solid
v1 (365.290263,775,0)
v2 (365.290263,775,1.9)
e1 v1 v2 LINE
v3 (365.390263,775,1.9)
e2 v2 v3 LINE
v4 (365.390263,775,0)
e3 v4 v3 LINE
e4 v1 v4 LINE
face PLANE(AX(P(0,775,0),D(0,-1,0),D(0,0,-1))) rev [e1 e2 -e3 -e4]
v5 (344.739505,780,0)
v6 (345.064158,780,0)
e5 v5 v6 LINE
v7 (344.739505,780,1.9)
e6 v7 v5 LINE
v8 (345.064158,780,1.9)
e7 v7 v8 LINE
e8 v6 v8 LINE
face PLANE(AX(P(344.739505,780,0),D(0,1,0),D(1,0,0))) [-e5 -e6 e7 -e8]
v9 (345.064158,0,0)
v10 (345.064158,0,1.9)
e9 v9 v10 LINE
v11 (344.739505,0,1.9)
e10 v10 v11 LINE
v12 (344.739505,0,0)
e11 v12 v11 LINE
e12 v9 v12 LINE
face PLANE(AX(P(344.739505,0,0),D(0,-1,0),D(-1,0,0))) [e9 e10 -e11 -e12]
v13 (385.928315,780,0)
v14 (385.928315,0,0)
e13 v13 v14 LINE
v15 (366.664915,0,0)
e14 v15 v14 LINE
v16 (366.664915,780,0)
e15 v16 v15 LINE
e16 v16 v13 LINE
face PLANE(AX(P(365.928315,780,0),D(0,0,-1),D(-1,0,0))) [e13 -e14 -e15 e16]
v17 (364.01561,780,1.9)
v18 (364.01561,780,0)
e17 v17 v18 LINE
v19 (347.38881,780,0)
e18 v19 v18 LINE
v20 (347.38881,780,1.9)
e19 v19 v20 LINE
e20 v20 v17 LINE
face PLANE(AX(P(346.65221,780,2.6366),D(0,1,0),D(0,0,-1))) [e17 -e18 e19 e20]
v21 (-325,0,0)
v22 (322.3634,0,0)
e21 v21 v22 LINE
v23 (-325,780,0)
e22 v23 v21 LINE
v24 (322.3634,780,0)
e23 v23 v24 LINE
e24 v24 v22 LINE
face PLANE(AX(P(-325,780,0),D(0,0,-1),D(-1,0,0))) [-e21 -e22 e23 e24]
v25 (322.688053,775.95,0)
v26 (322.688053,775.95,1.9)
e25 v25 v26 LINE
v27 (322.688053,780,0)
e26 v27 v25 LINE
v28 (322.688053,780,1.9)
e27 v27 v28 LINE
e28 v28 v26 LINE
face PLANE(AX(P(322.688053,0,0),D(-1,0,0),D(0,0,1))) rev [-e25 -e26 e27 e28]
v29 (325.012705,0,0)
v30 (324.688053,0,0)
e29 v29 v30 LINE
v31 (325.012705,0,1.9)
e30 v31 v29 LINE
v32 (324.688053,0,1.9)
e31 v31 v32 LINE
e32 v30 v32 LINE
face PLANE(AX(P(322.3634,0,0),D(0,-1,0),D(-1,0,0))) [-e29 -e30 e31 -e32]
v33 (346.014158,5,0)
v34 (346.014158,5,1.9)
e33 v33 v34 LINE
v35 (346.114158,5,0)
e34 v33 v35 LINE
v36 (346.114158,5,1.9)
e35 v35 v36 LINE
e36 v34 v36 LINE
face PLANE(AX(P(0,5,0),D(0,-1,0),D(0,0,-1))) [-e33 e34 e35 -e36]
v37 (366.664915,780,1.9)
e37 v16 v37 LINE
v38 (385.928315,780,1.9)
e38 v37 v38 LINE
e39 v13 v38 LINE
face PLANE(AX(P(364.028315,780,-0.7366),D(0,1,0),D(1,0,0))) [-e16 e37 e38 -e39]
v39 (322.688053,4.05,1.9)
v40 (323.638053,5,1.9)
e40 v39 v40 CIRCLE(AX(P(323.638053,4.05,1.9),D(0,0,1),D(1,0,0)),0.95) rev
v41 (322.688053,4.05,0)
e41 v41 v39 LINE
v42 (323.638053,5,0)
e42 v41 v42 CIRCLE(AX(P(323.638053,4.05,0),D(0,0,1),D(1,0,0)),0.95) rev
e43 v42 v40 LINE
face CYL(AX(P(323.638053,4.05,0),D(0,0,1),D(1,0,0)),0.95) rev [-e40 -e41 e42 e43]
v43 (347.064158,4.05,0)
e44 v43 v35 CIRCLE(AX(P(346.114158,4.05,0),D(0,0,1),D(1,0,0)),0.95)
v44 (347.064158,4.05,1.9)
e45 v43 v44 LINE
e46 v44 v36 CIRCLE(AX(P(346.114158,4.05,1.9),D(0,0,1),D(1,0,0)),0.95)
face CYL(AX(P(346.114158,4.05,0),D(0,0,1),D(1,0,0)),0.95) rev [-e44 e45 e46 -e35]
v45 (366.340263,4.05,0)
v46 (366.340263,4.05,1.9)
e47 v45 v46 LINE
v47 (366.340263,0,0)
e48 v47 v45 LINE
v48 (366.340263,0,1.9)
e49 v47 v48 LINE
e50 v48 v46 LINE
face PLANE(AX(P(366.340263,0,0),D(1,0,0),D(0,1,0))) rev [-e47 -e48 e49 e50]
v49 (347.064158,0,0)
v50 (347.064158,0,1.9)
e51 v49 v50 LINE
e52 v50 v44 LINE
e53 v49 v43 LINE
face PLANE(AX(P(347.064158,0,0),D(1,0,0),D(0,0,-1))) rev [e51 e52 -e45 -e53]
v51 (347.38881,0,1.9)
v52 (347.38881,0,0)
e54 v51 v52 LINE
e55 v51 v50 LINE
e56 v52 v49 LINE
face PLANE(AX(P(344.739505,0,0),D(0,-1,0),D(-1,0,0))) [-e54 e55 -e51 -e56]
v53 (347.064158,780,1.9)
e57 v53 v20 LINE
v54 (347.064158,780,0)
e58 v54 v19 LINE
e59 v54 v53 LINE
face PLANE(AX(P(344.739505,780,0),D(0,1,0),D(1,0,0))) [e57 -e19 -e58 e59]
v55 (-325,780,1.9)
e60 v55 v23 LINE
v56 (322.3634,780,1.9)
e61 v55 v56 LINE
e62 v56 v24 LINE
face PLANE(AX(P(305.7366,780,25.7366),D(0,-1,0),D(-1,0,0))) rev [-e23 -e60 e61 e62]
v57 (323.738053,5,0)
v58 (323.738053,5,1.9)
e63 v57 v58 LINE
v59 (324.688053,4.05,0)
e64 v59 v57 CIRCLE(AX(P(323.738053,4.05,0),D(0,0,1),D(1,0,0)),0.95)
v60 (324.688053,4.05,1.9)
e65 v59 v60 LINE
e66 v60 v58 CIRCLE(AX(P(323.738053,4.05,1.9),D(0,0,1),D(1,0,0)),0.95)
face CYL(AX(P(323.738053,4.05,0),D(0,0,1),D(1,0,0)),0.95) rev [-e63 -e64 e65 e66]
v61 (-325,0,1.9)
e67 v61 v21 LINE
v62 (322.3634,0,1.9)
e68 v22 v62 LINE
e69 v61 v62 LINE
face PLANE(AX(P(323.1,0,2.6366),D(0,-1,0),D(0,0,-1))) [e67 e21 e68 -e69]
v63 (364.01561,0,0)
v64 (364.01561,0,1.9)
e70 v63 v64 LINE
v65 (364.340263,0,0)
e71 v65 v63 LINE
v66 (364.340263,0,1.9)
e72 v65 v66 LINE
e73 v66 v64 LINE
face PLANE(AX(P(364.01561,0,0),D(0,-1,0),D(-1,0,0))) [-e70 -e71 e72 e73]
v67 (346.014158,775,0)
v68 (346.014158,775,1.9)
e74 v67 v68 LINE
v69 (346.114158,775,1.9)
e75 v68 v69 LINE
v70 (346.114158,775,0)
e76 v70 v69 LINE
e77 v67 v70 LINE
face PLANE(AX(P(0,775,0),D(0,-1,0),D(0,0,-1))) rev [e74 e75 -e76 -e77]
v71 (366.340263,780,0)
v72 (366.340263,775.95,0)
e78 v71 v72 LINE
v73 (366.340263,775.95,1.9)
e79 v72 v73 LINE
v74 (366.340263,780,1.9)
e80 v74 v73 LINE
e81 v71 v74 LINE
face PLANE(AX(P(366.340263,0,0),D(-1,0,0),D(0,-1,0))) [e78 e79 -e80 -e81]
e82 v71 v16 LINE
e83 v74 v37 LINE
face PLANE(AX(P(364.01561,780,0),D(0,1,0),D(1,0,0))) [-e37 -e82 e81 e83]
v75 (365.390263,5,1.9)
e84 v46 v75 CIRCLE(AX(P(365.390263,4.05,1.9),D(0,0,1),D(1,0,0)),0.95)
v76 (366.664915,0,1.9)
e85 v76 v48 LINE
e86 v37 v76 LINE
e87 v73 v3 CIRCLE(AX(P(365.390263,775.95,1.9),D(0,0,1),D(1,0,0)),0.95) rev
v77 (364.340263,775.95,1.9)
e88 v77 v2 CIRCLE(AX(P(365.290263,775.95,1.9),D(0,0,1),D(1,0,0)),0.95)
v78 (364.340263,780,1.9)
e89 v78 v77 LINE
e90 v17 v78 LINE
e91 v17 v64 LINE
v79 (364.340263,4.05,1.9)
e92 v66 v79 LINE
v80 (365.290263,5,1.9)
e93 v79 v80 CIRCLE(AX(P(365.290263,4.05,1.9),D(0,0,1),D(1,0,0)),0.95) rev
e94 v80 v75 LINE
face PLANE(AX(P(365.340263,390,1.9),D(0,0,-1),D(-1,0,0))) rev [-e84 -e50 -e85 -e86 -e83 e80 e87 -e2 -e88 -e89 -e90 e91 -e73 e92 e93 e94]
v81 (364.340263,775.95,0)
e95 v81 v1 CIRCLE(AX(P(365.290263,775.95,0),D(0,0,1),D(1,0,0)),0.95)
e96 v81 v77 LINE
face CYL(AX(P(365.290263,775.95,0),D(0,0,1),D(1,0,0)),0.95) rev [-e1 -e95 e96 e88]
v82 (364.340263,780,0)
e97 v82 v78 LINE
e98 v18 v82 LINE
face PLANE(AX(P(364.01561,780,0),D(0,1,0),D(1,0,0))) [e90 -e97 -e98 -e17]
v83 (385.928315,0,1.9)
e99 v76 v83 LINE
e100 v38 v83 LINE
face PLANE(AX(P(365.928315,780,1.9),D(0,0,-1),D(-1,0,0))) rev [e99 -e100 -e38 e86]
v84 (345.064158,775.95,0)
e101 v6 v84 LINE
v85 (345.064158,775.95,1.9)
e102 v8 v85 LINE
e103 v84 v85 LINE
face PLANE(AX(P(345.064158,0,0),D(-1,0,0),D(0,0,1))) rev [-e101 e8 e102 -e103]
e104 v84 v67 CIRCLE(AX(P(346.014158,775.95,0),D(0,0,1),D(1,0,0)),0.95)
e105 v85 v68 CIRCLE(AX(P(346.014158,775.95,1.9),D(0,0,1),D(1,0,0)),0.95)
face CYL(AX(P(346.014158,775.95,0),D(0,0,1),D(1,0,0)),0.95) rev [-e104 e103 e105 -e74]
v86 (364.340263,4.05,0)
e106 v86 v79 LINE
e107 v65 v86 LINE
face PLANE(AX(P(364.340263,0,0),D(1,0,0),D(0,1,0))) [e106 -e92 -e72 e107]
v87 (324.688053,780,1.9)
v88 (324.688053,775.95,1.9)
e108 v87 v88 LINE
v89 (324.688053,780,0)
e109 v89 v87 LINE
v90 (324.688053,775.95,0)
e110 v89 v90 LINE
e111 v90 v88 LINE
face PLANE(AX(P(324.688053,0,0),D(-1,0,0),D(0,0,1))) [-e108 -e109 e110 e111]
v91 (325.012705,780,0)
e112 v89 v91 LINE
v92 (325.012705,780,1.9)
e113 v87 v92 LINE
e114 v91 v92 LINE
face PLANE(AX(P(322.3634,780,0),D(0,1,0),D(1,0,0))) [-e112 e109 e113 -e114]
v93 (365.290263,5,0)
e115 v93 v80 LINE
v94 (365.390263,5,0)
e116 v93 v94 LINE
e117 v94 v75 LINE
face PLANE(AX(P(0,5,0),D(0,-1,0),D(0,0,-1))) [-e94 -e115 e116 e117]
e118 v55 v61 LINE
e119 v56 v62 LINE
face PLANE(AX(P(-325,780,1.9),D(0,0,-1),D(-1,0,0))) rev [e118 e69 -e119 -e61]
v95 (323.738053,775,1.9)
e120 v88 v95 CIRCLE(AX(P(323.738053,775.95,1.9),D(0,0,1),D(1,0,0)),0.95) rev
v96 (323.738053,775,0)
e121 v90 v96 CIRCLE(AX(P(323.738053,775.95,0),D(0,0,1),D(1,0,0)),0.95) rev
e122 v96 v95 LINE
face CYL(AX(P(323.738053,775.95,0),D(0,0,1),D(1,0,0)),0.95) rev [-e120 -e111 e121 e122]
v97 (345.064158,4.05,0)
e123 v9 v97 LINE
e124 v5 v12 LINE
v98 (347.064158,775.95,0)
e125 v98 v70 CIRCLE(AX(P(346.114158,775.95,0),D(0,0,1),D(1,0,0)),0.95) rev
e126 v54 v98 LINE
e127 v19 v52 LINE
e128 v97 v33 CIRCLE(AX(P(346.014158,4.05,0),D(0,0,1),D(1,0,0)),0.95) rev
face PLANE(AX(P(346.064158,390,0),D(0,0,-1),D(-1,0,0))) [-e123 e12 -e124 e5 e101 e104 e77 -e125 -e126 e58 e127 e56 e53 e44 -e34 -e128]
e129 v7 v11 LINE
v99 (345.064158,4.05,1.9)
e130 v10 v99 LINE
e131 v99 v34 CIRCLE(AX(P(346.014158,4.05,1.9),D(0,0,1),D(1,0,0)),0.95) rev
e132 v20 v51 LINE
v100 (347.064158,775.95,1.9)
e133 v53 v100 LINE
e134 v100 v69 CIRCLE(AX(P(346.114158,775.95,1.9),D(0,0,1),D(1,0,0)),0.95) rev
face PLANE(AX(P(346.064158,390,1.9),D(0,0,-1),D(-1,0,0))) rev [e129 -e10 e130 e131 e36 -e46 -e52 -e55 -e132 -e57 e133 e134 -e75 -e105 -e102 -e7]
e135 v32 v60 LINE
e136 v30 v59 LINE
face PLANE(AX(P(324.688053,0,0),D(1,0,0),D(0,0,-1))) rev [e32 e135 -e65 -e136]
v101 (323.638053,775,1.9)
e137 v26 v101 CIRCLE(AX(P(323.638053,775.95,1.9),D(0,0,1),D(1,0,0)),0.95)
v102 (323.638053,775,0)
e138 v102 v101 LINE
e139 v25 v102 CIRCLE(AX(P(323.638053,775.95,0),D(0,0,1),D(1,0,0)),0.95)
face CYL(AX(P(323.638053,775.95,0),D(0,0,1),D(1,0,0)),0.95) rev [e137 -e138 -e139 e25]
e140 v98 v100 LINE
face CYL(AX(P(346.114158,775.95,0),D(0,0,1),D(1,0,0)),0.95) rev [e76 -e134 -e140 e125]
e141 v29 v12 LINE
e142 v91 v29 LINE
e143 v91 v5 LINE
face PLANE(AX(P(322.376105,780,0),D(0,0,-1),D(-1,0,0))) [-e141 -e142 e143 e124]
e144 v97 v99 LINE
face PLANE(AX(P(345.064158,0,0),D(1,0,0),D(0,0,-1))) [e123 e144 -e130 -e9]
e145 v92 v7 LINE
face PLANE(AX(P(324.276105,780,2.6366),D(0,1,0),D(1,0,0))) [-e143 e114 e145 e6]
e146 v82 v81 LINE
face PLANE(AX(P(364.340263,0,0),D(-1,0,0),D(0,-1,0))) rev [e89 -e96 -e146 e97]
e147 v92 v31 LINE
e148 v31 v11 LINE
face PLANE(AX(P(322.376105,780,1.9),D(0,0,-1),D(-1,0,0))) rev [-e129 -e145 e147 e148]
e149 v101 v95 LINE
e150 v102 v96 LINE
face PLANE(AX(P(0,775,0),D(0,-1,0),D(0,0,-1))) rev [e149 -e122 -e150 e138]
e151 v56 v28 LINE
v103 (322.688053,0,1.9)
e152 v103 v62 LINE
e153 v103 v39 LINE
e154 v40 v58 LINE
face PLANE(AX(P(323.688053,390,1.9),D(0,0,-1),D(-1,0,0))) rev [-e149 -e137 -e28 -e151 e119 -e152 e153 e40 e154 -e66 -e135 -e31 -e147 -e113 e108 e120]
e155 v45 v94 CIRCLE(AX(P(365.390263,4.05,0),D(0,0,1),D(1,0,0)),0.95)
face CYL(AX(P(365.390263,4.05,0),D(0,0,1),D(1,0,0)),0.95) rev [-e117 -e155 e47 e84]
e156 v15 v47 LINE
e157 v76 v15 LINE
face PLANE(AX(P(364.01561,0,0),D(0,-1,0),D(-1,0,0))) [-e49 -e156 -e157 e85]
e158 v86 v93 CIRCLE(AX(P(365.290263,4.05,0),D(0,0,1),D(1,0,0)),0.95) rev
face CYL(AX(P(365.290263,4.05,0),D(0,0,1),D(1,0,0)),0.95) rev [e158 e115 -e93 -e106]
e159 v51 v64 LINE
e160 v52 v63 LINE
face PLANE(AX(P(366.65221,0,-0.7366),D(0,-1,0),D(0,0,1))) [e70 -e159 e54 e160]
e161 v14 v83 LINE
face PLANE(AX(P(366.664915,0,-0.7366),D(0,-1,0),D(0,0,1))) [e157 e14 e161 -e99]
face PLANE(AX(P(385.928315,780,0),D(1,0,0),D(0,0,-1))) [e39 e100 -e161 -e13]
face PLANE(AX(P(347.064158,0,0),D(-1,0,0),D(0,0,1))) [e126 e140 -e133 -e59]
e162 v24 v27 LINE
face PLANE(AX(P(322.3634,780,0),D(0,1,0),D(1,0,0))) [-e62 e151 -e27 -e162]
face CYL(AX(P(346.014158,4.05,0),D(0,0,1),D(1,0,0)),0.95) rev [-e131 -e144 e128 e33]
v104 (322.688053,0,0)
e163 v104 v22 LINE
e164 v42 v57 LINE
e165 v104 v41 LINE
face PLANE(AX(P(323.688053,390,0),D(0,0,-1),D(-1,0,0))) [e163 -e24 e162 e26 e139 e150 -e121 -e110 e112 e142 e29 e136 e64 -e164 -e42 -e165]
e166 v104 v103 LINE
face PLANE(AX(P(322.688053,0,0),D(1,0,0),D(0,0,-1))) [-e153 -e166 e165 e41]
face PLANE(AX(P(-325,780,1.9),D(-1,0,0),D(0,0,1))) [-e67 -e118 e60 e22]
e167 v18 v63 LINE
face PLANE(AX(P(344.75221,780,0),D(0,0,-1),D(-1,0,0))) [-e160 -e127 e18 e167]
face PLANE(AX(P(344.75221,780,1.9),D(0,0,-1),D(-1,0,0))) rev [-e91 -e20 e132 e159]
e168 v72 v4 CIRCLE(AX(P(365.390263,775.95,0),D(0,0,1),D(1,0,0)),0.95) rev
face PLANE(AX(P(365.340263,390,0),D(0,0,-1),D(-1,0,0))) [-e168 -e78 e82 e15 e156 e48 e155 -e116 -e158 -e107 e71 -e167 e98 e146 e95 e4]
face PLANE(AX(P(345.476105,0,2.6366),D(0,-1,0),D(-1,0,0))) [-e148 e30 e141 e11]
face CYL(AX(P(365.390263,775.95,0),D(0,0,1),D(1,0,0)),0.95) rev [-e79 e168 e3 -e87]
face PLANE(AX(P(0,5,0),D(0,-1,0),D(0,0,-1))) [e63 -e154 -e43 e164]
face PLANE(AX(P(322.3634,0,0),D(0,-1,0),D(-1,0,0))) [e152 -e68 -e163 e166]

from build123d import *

# Parameters (mm, degrees)
BRIDA_BASE1_DEPTH          = 780
DESDOBLAR1_DEPTH           = 780
DESDOBLAR1_2_DEPTH         = 780
CORTAR_EXTRUIR1_DEPTH      = 871.255292724
CORTAR_EXTRUIR1_DEPTH_BACK = 871.255292724


# Read off the part's stored shape, not the designer's step: Desdoblar1
# Sheet-metal steps are written as plain solids
with BuildPart() as part:
    # Croquis55 → Brida base1 (new body)
    with BuildSketch(Plane(origin=(0, 0, 0), x_dir=(1, 0, 0), z_dir=(0, 1, 0))):
        with BuildLine():
            Line((-325, 0), (322.3634, 0))
            ThreePointArc((322.3634, 0), (324.227757739, -0.772242261), (325, -2.6366))
            Line((325, -2.6366), (325, -22.3634))
            ThreePointArc((325, -22.3634), (324.227757739, -24.227757739), (322.3634, -25))
            Line((322.3634, -25), (305.7366, -25))
            ThreePointArc((305.7366, -25), (305.215745145, -25.215745145), (305, -25.7366))
            Line((305, -25.7366), (305, -45))
            Line((305, -45), (303.1, -45))
            Line((303.1, -45), (303.1, -25.7366))
            ThreePointArc((303.1, -25.7366), (303.872242261, -23.872242261), (305.7366, -23.1))
            Line((305.7366, -23.1), (322.3634, -23.1))
            ThreePointArc((322.3634, -23.1), (322.884254855, -22.884254855), (323.1, -22.3634))
            Line((323.1, -22.3634), (323.1, -2.6366))
            ThreePointArc((323.1, -2.6366), (322.884254855, -2.115745145), (322.3634, -1.9))
            Line((322.3634, -1.9), (-325, -1.9))
            Line((-325, -1.9), (-325, 0))
        make_face()
    extrude(amount=BRIDA_BASE1_DEPTH)

    # Desdoblar1 outline → Desdoblar1 (cut)
    with BuildSketch(Plane(origin=(0, 0, 0), x_dir=(1, 0, 0), z_dir=(0, 1, 0))):
        with BuildLine():
            ThreePointArc((325, -2.6366), (324.973622072, -2.264578098), (324.895016084, -1.9))
            Line((324.895016084, -1.9), (322.3634, -1.9))
            ThreePointArc((322.3634, -1.9), (322.884254855, -2.115745145), (323.1, -2.6366))
            Line((323.1, -2.6366), (323.1, -22.3634))
            ThreePointArc((323.1, -22.3634), (322.884254855, -22.884254855), (322.3634, -23.1))
            Line((322.3634, -23.1), (305.7366, -23.1))
            ThreePointArc((305.7366, -23.1), (303.872242261, -23.872242261), (303.1, -25.7366))
            Line((303.1, -25.7366), (303.1, -45))
            Line((303.1, -45), (305, -45))
            Line((305, -45), (305, -25.7366))
            ThreePointArc((305, -25.7366), (305.215745145, -25.215745145), (305.7366, -25))
            Line((305.7366, -25), (322.3634, -25))
            ThreePointArc((322.3634, -25), (324.227757739, -24.227757739), (325, -22.3634))
            Line((325, -22.3634), (325, -2.6366))
        make_face()
    extrude(amount=DESDOBLAR1_DEPTH, mode=Mode.SUBTRACT)

    # Desdoblar1 2 outline → Desdoblar1 2 (add)
    with BuildSketch(Plane(origin=(0, 0, 0), x_dir=(1, 0, 0), z_dir=(0, 1, 0))):
        with BuildLine():
            Line((385.928315254, 0), (322.3634, 0))
            ThreePointArc((322.3634, 0), (323.946046517, -0.527835063), (324.895016084, -1.9))
            Line((324.895016084, -1.9), (385.928315254, -1.9))
            Line((385.928315254, -1.9), (385.928315254, 0))
        make_face()
    extrude(amount=DESDOBLAR1_2_DEPTH)

    # Croquis56 → Cortar-Extruir1 (cut, two sides: drawn at the far end of the back side and taken through both)
    with BuildSketch(Plane.XY.offset(1.9).offset(-CORTAR_EXTRUIR1_DEPTH_BACK)):
        with BuildLine():
            Line((322.688052542, 780), (322.688052542, 775.95))
            ThreePointArc((322.688052542, 775.95), (322.9663011, 775.278248558), (323.638052542, 775))
            Line((323.638052542, 775), (323.738052542, 775))
            ThreePointArc((323.738052542, 775), (324.409803985, 775.278248558), (324.688052542, 775.95))
            Line((324.688052542, 775.95), (324.688052542, 780))
            Line((324.688052542, 780), (322.688052542, 780))
        make_face()
        with BuildLine():
            Line((345.064157627, 780), (345.064157627, 775.95))
            ThreePointArc((345.064157627, 775.95), (345.342406185, 775.278248558), (346.014157627, 775))
            Line((346.014157627, 775), (346.114157627, 775))
            ThreePointArc((346.114157627, 775), (346.785909069, 775.278248558), (347.064157627, 775.95))
            Line((347.064157627, 775.95), (347.064157627, 780))
            Line((347.064157627, 780), (345.064157627, 780))
        make_face()
        with BuildLine():
            Line((364.340262712, 780), (364.340262712, 775.95))
            ThreePointArc((364.340262712, 775.95), (364.61851127, 775.278248558), (365.290262712, 775))
            Line((365.290262712, 775), (365.390262712, 775))
            ThreePointArc((365.390262712, 775), (366.062014154, 775.278248558), (366.340262712, 775.95))
            Line((366.340262712, 775.95), (366.340262712, 780))
            Line((366.340262712, 780), (364.340262712, 780))
        make_face()
        with BuildLine():
            Line((364.340262712, 0), (366.340262712, 0))
            Line((366.340262712, 0), (366.340262712, 4.05))
            ThreePointArc((366.340262712, 4.05), (366.062014154, 4.721751442), (365.390262712, 5))
            Line((365.390262712, 5), (365.290262712, 5))
            ThreePointArc((365.290262712, 5), (364.61851127, 4.721751442), (364.340262712, 4.05))
            Line((364.340262712, 4.05), (364.340262712, 0))
        make_face()
        with BuildLine():
            Line((345.064157627, 0), (347.064157627, 0))
            Line((347.064157627, 0), (347.064157627, 4.05))
            ThreePointArc((347.064157627, 4.05), (346.785909069, 4.721751442), (346.114157627, 5))
            Line((346.114157627, 5), (346.014157627, 5))
            ThreePointArc((346.014157627, 5), (345.342406185, 4.721751442), (345.064157627, 4.05))
            Line((345.064157627, 4.05), (345.064157627, 0))
        make_face()
        with BuildLine():
            Line((322.688052542, 0), (324.688052542, 0))
            Line((324.688052542, 0), (324.688052542, 4.05))
            ThreePointArc((324.688052542, 4.05), (324.409803985, 4.721751442), (323.738052542, 5))
            Line((323.738052542, 5), (323.638052542, 5))
            ThreePointArc((323.638052542, 5), (322.9663011, 4.721751442), (322.688052542, 4.05))
            Line((322.688052542, 4.05), (322.688052542, 0))
        make_face()
    extrude(amount=CORTAR_EXTRUIR1_DEPTH + CORTAR_EXTRUIR1_DEPTH_BACK, mode=Mode.SUBTRACT)


solid = part.part
